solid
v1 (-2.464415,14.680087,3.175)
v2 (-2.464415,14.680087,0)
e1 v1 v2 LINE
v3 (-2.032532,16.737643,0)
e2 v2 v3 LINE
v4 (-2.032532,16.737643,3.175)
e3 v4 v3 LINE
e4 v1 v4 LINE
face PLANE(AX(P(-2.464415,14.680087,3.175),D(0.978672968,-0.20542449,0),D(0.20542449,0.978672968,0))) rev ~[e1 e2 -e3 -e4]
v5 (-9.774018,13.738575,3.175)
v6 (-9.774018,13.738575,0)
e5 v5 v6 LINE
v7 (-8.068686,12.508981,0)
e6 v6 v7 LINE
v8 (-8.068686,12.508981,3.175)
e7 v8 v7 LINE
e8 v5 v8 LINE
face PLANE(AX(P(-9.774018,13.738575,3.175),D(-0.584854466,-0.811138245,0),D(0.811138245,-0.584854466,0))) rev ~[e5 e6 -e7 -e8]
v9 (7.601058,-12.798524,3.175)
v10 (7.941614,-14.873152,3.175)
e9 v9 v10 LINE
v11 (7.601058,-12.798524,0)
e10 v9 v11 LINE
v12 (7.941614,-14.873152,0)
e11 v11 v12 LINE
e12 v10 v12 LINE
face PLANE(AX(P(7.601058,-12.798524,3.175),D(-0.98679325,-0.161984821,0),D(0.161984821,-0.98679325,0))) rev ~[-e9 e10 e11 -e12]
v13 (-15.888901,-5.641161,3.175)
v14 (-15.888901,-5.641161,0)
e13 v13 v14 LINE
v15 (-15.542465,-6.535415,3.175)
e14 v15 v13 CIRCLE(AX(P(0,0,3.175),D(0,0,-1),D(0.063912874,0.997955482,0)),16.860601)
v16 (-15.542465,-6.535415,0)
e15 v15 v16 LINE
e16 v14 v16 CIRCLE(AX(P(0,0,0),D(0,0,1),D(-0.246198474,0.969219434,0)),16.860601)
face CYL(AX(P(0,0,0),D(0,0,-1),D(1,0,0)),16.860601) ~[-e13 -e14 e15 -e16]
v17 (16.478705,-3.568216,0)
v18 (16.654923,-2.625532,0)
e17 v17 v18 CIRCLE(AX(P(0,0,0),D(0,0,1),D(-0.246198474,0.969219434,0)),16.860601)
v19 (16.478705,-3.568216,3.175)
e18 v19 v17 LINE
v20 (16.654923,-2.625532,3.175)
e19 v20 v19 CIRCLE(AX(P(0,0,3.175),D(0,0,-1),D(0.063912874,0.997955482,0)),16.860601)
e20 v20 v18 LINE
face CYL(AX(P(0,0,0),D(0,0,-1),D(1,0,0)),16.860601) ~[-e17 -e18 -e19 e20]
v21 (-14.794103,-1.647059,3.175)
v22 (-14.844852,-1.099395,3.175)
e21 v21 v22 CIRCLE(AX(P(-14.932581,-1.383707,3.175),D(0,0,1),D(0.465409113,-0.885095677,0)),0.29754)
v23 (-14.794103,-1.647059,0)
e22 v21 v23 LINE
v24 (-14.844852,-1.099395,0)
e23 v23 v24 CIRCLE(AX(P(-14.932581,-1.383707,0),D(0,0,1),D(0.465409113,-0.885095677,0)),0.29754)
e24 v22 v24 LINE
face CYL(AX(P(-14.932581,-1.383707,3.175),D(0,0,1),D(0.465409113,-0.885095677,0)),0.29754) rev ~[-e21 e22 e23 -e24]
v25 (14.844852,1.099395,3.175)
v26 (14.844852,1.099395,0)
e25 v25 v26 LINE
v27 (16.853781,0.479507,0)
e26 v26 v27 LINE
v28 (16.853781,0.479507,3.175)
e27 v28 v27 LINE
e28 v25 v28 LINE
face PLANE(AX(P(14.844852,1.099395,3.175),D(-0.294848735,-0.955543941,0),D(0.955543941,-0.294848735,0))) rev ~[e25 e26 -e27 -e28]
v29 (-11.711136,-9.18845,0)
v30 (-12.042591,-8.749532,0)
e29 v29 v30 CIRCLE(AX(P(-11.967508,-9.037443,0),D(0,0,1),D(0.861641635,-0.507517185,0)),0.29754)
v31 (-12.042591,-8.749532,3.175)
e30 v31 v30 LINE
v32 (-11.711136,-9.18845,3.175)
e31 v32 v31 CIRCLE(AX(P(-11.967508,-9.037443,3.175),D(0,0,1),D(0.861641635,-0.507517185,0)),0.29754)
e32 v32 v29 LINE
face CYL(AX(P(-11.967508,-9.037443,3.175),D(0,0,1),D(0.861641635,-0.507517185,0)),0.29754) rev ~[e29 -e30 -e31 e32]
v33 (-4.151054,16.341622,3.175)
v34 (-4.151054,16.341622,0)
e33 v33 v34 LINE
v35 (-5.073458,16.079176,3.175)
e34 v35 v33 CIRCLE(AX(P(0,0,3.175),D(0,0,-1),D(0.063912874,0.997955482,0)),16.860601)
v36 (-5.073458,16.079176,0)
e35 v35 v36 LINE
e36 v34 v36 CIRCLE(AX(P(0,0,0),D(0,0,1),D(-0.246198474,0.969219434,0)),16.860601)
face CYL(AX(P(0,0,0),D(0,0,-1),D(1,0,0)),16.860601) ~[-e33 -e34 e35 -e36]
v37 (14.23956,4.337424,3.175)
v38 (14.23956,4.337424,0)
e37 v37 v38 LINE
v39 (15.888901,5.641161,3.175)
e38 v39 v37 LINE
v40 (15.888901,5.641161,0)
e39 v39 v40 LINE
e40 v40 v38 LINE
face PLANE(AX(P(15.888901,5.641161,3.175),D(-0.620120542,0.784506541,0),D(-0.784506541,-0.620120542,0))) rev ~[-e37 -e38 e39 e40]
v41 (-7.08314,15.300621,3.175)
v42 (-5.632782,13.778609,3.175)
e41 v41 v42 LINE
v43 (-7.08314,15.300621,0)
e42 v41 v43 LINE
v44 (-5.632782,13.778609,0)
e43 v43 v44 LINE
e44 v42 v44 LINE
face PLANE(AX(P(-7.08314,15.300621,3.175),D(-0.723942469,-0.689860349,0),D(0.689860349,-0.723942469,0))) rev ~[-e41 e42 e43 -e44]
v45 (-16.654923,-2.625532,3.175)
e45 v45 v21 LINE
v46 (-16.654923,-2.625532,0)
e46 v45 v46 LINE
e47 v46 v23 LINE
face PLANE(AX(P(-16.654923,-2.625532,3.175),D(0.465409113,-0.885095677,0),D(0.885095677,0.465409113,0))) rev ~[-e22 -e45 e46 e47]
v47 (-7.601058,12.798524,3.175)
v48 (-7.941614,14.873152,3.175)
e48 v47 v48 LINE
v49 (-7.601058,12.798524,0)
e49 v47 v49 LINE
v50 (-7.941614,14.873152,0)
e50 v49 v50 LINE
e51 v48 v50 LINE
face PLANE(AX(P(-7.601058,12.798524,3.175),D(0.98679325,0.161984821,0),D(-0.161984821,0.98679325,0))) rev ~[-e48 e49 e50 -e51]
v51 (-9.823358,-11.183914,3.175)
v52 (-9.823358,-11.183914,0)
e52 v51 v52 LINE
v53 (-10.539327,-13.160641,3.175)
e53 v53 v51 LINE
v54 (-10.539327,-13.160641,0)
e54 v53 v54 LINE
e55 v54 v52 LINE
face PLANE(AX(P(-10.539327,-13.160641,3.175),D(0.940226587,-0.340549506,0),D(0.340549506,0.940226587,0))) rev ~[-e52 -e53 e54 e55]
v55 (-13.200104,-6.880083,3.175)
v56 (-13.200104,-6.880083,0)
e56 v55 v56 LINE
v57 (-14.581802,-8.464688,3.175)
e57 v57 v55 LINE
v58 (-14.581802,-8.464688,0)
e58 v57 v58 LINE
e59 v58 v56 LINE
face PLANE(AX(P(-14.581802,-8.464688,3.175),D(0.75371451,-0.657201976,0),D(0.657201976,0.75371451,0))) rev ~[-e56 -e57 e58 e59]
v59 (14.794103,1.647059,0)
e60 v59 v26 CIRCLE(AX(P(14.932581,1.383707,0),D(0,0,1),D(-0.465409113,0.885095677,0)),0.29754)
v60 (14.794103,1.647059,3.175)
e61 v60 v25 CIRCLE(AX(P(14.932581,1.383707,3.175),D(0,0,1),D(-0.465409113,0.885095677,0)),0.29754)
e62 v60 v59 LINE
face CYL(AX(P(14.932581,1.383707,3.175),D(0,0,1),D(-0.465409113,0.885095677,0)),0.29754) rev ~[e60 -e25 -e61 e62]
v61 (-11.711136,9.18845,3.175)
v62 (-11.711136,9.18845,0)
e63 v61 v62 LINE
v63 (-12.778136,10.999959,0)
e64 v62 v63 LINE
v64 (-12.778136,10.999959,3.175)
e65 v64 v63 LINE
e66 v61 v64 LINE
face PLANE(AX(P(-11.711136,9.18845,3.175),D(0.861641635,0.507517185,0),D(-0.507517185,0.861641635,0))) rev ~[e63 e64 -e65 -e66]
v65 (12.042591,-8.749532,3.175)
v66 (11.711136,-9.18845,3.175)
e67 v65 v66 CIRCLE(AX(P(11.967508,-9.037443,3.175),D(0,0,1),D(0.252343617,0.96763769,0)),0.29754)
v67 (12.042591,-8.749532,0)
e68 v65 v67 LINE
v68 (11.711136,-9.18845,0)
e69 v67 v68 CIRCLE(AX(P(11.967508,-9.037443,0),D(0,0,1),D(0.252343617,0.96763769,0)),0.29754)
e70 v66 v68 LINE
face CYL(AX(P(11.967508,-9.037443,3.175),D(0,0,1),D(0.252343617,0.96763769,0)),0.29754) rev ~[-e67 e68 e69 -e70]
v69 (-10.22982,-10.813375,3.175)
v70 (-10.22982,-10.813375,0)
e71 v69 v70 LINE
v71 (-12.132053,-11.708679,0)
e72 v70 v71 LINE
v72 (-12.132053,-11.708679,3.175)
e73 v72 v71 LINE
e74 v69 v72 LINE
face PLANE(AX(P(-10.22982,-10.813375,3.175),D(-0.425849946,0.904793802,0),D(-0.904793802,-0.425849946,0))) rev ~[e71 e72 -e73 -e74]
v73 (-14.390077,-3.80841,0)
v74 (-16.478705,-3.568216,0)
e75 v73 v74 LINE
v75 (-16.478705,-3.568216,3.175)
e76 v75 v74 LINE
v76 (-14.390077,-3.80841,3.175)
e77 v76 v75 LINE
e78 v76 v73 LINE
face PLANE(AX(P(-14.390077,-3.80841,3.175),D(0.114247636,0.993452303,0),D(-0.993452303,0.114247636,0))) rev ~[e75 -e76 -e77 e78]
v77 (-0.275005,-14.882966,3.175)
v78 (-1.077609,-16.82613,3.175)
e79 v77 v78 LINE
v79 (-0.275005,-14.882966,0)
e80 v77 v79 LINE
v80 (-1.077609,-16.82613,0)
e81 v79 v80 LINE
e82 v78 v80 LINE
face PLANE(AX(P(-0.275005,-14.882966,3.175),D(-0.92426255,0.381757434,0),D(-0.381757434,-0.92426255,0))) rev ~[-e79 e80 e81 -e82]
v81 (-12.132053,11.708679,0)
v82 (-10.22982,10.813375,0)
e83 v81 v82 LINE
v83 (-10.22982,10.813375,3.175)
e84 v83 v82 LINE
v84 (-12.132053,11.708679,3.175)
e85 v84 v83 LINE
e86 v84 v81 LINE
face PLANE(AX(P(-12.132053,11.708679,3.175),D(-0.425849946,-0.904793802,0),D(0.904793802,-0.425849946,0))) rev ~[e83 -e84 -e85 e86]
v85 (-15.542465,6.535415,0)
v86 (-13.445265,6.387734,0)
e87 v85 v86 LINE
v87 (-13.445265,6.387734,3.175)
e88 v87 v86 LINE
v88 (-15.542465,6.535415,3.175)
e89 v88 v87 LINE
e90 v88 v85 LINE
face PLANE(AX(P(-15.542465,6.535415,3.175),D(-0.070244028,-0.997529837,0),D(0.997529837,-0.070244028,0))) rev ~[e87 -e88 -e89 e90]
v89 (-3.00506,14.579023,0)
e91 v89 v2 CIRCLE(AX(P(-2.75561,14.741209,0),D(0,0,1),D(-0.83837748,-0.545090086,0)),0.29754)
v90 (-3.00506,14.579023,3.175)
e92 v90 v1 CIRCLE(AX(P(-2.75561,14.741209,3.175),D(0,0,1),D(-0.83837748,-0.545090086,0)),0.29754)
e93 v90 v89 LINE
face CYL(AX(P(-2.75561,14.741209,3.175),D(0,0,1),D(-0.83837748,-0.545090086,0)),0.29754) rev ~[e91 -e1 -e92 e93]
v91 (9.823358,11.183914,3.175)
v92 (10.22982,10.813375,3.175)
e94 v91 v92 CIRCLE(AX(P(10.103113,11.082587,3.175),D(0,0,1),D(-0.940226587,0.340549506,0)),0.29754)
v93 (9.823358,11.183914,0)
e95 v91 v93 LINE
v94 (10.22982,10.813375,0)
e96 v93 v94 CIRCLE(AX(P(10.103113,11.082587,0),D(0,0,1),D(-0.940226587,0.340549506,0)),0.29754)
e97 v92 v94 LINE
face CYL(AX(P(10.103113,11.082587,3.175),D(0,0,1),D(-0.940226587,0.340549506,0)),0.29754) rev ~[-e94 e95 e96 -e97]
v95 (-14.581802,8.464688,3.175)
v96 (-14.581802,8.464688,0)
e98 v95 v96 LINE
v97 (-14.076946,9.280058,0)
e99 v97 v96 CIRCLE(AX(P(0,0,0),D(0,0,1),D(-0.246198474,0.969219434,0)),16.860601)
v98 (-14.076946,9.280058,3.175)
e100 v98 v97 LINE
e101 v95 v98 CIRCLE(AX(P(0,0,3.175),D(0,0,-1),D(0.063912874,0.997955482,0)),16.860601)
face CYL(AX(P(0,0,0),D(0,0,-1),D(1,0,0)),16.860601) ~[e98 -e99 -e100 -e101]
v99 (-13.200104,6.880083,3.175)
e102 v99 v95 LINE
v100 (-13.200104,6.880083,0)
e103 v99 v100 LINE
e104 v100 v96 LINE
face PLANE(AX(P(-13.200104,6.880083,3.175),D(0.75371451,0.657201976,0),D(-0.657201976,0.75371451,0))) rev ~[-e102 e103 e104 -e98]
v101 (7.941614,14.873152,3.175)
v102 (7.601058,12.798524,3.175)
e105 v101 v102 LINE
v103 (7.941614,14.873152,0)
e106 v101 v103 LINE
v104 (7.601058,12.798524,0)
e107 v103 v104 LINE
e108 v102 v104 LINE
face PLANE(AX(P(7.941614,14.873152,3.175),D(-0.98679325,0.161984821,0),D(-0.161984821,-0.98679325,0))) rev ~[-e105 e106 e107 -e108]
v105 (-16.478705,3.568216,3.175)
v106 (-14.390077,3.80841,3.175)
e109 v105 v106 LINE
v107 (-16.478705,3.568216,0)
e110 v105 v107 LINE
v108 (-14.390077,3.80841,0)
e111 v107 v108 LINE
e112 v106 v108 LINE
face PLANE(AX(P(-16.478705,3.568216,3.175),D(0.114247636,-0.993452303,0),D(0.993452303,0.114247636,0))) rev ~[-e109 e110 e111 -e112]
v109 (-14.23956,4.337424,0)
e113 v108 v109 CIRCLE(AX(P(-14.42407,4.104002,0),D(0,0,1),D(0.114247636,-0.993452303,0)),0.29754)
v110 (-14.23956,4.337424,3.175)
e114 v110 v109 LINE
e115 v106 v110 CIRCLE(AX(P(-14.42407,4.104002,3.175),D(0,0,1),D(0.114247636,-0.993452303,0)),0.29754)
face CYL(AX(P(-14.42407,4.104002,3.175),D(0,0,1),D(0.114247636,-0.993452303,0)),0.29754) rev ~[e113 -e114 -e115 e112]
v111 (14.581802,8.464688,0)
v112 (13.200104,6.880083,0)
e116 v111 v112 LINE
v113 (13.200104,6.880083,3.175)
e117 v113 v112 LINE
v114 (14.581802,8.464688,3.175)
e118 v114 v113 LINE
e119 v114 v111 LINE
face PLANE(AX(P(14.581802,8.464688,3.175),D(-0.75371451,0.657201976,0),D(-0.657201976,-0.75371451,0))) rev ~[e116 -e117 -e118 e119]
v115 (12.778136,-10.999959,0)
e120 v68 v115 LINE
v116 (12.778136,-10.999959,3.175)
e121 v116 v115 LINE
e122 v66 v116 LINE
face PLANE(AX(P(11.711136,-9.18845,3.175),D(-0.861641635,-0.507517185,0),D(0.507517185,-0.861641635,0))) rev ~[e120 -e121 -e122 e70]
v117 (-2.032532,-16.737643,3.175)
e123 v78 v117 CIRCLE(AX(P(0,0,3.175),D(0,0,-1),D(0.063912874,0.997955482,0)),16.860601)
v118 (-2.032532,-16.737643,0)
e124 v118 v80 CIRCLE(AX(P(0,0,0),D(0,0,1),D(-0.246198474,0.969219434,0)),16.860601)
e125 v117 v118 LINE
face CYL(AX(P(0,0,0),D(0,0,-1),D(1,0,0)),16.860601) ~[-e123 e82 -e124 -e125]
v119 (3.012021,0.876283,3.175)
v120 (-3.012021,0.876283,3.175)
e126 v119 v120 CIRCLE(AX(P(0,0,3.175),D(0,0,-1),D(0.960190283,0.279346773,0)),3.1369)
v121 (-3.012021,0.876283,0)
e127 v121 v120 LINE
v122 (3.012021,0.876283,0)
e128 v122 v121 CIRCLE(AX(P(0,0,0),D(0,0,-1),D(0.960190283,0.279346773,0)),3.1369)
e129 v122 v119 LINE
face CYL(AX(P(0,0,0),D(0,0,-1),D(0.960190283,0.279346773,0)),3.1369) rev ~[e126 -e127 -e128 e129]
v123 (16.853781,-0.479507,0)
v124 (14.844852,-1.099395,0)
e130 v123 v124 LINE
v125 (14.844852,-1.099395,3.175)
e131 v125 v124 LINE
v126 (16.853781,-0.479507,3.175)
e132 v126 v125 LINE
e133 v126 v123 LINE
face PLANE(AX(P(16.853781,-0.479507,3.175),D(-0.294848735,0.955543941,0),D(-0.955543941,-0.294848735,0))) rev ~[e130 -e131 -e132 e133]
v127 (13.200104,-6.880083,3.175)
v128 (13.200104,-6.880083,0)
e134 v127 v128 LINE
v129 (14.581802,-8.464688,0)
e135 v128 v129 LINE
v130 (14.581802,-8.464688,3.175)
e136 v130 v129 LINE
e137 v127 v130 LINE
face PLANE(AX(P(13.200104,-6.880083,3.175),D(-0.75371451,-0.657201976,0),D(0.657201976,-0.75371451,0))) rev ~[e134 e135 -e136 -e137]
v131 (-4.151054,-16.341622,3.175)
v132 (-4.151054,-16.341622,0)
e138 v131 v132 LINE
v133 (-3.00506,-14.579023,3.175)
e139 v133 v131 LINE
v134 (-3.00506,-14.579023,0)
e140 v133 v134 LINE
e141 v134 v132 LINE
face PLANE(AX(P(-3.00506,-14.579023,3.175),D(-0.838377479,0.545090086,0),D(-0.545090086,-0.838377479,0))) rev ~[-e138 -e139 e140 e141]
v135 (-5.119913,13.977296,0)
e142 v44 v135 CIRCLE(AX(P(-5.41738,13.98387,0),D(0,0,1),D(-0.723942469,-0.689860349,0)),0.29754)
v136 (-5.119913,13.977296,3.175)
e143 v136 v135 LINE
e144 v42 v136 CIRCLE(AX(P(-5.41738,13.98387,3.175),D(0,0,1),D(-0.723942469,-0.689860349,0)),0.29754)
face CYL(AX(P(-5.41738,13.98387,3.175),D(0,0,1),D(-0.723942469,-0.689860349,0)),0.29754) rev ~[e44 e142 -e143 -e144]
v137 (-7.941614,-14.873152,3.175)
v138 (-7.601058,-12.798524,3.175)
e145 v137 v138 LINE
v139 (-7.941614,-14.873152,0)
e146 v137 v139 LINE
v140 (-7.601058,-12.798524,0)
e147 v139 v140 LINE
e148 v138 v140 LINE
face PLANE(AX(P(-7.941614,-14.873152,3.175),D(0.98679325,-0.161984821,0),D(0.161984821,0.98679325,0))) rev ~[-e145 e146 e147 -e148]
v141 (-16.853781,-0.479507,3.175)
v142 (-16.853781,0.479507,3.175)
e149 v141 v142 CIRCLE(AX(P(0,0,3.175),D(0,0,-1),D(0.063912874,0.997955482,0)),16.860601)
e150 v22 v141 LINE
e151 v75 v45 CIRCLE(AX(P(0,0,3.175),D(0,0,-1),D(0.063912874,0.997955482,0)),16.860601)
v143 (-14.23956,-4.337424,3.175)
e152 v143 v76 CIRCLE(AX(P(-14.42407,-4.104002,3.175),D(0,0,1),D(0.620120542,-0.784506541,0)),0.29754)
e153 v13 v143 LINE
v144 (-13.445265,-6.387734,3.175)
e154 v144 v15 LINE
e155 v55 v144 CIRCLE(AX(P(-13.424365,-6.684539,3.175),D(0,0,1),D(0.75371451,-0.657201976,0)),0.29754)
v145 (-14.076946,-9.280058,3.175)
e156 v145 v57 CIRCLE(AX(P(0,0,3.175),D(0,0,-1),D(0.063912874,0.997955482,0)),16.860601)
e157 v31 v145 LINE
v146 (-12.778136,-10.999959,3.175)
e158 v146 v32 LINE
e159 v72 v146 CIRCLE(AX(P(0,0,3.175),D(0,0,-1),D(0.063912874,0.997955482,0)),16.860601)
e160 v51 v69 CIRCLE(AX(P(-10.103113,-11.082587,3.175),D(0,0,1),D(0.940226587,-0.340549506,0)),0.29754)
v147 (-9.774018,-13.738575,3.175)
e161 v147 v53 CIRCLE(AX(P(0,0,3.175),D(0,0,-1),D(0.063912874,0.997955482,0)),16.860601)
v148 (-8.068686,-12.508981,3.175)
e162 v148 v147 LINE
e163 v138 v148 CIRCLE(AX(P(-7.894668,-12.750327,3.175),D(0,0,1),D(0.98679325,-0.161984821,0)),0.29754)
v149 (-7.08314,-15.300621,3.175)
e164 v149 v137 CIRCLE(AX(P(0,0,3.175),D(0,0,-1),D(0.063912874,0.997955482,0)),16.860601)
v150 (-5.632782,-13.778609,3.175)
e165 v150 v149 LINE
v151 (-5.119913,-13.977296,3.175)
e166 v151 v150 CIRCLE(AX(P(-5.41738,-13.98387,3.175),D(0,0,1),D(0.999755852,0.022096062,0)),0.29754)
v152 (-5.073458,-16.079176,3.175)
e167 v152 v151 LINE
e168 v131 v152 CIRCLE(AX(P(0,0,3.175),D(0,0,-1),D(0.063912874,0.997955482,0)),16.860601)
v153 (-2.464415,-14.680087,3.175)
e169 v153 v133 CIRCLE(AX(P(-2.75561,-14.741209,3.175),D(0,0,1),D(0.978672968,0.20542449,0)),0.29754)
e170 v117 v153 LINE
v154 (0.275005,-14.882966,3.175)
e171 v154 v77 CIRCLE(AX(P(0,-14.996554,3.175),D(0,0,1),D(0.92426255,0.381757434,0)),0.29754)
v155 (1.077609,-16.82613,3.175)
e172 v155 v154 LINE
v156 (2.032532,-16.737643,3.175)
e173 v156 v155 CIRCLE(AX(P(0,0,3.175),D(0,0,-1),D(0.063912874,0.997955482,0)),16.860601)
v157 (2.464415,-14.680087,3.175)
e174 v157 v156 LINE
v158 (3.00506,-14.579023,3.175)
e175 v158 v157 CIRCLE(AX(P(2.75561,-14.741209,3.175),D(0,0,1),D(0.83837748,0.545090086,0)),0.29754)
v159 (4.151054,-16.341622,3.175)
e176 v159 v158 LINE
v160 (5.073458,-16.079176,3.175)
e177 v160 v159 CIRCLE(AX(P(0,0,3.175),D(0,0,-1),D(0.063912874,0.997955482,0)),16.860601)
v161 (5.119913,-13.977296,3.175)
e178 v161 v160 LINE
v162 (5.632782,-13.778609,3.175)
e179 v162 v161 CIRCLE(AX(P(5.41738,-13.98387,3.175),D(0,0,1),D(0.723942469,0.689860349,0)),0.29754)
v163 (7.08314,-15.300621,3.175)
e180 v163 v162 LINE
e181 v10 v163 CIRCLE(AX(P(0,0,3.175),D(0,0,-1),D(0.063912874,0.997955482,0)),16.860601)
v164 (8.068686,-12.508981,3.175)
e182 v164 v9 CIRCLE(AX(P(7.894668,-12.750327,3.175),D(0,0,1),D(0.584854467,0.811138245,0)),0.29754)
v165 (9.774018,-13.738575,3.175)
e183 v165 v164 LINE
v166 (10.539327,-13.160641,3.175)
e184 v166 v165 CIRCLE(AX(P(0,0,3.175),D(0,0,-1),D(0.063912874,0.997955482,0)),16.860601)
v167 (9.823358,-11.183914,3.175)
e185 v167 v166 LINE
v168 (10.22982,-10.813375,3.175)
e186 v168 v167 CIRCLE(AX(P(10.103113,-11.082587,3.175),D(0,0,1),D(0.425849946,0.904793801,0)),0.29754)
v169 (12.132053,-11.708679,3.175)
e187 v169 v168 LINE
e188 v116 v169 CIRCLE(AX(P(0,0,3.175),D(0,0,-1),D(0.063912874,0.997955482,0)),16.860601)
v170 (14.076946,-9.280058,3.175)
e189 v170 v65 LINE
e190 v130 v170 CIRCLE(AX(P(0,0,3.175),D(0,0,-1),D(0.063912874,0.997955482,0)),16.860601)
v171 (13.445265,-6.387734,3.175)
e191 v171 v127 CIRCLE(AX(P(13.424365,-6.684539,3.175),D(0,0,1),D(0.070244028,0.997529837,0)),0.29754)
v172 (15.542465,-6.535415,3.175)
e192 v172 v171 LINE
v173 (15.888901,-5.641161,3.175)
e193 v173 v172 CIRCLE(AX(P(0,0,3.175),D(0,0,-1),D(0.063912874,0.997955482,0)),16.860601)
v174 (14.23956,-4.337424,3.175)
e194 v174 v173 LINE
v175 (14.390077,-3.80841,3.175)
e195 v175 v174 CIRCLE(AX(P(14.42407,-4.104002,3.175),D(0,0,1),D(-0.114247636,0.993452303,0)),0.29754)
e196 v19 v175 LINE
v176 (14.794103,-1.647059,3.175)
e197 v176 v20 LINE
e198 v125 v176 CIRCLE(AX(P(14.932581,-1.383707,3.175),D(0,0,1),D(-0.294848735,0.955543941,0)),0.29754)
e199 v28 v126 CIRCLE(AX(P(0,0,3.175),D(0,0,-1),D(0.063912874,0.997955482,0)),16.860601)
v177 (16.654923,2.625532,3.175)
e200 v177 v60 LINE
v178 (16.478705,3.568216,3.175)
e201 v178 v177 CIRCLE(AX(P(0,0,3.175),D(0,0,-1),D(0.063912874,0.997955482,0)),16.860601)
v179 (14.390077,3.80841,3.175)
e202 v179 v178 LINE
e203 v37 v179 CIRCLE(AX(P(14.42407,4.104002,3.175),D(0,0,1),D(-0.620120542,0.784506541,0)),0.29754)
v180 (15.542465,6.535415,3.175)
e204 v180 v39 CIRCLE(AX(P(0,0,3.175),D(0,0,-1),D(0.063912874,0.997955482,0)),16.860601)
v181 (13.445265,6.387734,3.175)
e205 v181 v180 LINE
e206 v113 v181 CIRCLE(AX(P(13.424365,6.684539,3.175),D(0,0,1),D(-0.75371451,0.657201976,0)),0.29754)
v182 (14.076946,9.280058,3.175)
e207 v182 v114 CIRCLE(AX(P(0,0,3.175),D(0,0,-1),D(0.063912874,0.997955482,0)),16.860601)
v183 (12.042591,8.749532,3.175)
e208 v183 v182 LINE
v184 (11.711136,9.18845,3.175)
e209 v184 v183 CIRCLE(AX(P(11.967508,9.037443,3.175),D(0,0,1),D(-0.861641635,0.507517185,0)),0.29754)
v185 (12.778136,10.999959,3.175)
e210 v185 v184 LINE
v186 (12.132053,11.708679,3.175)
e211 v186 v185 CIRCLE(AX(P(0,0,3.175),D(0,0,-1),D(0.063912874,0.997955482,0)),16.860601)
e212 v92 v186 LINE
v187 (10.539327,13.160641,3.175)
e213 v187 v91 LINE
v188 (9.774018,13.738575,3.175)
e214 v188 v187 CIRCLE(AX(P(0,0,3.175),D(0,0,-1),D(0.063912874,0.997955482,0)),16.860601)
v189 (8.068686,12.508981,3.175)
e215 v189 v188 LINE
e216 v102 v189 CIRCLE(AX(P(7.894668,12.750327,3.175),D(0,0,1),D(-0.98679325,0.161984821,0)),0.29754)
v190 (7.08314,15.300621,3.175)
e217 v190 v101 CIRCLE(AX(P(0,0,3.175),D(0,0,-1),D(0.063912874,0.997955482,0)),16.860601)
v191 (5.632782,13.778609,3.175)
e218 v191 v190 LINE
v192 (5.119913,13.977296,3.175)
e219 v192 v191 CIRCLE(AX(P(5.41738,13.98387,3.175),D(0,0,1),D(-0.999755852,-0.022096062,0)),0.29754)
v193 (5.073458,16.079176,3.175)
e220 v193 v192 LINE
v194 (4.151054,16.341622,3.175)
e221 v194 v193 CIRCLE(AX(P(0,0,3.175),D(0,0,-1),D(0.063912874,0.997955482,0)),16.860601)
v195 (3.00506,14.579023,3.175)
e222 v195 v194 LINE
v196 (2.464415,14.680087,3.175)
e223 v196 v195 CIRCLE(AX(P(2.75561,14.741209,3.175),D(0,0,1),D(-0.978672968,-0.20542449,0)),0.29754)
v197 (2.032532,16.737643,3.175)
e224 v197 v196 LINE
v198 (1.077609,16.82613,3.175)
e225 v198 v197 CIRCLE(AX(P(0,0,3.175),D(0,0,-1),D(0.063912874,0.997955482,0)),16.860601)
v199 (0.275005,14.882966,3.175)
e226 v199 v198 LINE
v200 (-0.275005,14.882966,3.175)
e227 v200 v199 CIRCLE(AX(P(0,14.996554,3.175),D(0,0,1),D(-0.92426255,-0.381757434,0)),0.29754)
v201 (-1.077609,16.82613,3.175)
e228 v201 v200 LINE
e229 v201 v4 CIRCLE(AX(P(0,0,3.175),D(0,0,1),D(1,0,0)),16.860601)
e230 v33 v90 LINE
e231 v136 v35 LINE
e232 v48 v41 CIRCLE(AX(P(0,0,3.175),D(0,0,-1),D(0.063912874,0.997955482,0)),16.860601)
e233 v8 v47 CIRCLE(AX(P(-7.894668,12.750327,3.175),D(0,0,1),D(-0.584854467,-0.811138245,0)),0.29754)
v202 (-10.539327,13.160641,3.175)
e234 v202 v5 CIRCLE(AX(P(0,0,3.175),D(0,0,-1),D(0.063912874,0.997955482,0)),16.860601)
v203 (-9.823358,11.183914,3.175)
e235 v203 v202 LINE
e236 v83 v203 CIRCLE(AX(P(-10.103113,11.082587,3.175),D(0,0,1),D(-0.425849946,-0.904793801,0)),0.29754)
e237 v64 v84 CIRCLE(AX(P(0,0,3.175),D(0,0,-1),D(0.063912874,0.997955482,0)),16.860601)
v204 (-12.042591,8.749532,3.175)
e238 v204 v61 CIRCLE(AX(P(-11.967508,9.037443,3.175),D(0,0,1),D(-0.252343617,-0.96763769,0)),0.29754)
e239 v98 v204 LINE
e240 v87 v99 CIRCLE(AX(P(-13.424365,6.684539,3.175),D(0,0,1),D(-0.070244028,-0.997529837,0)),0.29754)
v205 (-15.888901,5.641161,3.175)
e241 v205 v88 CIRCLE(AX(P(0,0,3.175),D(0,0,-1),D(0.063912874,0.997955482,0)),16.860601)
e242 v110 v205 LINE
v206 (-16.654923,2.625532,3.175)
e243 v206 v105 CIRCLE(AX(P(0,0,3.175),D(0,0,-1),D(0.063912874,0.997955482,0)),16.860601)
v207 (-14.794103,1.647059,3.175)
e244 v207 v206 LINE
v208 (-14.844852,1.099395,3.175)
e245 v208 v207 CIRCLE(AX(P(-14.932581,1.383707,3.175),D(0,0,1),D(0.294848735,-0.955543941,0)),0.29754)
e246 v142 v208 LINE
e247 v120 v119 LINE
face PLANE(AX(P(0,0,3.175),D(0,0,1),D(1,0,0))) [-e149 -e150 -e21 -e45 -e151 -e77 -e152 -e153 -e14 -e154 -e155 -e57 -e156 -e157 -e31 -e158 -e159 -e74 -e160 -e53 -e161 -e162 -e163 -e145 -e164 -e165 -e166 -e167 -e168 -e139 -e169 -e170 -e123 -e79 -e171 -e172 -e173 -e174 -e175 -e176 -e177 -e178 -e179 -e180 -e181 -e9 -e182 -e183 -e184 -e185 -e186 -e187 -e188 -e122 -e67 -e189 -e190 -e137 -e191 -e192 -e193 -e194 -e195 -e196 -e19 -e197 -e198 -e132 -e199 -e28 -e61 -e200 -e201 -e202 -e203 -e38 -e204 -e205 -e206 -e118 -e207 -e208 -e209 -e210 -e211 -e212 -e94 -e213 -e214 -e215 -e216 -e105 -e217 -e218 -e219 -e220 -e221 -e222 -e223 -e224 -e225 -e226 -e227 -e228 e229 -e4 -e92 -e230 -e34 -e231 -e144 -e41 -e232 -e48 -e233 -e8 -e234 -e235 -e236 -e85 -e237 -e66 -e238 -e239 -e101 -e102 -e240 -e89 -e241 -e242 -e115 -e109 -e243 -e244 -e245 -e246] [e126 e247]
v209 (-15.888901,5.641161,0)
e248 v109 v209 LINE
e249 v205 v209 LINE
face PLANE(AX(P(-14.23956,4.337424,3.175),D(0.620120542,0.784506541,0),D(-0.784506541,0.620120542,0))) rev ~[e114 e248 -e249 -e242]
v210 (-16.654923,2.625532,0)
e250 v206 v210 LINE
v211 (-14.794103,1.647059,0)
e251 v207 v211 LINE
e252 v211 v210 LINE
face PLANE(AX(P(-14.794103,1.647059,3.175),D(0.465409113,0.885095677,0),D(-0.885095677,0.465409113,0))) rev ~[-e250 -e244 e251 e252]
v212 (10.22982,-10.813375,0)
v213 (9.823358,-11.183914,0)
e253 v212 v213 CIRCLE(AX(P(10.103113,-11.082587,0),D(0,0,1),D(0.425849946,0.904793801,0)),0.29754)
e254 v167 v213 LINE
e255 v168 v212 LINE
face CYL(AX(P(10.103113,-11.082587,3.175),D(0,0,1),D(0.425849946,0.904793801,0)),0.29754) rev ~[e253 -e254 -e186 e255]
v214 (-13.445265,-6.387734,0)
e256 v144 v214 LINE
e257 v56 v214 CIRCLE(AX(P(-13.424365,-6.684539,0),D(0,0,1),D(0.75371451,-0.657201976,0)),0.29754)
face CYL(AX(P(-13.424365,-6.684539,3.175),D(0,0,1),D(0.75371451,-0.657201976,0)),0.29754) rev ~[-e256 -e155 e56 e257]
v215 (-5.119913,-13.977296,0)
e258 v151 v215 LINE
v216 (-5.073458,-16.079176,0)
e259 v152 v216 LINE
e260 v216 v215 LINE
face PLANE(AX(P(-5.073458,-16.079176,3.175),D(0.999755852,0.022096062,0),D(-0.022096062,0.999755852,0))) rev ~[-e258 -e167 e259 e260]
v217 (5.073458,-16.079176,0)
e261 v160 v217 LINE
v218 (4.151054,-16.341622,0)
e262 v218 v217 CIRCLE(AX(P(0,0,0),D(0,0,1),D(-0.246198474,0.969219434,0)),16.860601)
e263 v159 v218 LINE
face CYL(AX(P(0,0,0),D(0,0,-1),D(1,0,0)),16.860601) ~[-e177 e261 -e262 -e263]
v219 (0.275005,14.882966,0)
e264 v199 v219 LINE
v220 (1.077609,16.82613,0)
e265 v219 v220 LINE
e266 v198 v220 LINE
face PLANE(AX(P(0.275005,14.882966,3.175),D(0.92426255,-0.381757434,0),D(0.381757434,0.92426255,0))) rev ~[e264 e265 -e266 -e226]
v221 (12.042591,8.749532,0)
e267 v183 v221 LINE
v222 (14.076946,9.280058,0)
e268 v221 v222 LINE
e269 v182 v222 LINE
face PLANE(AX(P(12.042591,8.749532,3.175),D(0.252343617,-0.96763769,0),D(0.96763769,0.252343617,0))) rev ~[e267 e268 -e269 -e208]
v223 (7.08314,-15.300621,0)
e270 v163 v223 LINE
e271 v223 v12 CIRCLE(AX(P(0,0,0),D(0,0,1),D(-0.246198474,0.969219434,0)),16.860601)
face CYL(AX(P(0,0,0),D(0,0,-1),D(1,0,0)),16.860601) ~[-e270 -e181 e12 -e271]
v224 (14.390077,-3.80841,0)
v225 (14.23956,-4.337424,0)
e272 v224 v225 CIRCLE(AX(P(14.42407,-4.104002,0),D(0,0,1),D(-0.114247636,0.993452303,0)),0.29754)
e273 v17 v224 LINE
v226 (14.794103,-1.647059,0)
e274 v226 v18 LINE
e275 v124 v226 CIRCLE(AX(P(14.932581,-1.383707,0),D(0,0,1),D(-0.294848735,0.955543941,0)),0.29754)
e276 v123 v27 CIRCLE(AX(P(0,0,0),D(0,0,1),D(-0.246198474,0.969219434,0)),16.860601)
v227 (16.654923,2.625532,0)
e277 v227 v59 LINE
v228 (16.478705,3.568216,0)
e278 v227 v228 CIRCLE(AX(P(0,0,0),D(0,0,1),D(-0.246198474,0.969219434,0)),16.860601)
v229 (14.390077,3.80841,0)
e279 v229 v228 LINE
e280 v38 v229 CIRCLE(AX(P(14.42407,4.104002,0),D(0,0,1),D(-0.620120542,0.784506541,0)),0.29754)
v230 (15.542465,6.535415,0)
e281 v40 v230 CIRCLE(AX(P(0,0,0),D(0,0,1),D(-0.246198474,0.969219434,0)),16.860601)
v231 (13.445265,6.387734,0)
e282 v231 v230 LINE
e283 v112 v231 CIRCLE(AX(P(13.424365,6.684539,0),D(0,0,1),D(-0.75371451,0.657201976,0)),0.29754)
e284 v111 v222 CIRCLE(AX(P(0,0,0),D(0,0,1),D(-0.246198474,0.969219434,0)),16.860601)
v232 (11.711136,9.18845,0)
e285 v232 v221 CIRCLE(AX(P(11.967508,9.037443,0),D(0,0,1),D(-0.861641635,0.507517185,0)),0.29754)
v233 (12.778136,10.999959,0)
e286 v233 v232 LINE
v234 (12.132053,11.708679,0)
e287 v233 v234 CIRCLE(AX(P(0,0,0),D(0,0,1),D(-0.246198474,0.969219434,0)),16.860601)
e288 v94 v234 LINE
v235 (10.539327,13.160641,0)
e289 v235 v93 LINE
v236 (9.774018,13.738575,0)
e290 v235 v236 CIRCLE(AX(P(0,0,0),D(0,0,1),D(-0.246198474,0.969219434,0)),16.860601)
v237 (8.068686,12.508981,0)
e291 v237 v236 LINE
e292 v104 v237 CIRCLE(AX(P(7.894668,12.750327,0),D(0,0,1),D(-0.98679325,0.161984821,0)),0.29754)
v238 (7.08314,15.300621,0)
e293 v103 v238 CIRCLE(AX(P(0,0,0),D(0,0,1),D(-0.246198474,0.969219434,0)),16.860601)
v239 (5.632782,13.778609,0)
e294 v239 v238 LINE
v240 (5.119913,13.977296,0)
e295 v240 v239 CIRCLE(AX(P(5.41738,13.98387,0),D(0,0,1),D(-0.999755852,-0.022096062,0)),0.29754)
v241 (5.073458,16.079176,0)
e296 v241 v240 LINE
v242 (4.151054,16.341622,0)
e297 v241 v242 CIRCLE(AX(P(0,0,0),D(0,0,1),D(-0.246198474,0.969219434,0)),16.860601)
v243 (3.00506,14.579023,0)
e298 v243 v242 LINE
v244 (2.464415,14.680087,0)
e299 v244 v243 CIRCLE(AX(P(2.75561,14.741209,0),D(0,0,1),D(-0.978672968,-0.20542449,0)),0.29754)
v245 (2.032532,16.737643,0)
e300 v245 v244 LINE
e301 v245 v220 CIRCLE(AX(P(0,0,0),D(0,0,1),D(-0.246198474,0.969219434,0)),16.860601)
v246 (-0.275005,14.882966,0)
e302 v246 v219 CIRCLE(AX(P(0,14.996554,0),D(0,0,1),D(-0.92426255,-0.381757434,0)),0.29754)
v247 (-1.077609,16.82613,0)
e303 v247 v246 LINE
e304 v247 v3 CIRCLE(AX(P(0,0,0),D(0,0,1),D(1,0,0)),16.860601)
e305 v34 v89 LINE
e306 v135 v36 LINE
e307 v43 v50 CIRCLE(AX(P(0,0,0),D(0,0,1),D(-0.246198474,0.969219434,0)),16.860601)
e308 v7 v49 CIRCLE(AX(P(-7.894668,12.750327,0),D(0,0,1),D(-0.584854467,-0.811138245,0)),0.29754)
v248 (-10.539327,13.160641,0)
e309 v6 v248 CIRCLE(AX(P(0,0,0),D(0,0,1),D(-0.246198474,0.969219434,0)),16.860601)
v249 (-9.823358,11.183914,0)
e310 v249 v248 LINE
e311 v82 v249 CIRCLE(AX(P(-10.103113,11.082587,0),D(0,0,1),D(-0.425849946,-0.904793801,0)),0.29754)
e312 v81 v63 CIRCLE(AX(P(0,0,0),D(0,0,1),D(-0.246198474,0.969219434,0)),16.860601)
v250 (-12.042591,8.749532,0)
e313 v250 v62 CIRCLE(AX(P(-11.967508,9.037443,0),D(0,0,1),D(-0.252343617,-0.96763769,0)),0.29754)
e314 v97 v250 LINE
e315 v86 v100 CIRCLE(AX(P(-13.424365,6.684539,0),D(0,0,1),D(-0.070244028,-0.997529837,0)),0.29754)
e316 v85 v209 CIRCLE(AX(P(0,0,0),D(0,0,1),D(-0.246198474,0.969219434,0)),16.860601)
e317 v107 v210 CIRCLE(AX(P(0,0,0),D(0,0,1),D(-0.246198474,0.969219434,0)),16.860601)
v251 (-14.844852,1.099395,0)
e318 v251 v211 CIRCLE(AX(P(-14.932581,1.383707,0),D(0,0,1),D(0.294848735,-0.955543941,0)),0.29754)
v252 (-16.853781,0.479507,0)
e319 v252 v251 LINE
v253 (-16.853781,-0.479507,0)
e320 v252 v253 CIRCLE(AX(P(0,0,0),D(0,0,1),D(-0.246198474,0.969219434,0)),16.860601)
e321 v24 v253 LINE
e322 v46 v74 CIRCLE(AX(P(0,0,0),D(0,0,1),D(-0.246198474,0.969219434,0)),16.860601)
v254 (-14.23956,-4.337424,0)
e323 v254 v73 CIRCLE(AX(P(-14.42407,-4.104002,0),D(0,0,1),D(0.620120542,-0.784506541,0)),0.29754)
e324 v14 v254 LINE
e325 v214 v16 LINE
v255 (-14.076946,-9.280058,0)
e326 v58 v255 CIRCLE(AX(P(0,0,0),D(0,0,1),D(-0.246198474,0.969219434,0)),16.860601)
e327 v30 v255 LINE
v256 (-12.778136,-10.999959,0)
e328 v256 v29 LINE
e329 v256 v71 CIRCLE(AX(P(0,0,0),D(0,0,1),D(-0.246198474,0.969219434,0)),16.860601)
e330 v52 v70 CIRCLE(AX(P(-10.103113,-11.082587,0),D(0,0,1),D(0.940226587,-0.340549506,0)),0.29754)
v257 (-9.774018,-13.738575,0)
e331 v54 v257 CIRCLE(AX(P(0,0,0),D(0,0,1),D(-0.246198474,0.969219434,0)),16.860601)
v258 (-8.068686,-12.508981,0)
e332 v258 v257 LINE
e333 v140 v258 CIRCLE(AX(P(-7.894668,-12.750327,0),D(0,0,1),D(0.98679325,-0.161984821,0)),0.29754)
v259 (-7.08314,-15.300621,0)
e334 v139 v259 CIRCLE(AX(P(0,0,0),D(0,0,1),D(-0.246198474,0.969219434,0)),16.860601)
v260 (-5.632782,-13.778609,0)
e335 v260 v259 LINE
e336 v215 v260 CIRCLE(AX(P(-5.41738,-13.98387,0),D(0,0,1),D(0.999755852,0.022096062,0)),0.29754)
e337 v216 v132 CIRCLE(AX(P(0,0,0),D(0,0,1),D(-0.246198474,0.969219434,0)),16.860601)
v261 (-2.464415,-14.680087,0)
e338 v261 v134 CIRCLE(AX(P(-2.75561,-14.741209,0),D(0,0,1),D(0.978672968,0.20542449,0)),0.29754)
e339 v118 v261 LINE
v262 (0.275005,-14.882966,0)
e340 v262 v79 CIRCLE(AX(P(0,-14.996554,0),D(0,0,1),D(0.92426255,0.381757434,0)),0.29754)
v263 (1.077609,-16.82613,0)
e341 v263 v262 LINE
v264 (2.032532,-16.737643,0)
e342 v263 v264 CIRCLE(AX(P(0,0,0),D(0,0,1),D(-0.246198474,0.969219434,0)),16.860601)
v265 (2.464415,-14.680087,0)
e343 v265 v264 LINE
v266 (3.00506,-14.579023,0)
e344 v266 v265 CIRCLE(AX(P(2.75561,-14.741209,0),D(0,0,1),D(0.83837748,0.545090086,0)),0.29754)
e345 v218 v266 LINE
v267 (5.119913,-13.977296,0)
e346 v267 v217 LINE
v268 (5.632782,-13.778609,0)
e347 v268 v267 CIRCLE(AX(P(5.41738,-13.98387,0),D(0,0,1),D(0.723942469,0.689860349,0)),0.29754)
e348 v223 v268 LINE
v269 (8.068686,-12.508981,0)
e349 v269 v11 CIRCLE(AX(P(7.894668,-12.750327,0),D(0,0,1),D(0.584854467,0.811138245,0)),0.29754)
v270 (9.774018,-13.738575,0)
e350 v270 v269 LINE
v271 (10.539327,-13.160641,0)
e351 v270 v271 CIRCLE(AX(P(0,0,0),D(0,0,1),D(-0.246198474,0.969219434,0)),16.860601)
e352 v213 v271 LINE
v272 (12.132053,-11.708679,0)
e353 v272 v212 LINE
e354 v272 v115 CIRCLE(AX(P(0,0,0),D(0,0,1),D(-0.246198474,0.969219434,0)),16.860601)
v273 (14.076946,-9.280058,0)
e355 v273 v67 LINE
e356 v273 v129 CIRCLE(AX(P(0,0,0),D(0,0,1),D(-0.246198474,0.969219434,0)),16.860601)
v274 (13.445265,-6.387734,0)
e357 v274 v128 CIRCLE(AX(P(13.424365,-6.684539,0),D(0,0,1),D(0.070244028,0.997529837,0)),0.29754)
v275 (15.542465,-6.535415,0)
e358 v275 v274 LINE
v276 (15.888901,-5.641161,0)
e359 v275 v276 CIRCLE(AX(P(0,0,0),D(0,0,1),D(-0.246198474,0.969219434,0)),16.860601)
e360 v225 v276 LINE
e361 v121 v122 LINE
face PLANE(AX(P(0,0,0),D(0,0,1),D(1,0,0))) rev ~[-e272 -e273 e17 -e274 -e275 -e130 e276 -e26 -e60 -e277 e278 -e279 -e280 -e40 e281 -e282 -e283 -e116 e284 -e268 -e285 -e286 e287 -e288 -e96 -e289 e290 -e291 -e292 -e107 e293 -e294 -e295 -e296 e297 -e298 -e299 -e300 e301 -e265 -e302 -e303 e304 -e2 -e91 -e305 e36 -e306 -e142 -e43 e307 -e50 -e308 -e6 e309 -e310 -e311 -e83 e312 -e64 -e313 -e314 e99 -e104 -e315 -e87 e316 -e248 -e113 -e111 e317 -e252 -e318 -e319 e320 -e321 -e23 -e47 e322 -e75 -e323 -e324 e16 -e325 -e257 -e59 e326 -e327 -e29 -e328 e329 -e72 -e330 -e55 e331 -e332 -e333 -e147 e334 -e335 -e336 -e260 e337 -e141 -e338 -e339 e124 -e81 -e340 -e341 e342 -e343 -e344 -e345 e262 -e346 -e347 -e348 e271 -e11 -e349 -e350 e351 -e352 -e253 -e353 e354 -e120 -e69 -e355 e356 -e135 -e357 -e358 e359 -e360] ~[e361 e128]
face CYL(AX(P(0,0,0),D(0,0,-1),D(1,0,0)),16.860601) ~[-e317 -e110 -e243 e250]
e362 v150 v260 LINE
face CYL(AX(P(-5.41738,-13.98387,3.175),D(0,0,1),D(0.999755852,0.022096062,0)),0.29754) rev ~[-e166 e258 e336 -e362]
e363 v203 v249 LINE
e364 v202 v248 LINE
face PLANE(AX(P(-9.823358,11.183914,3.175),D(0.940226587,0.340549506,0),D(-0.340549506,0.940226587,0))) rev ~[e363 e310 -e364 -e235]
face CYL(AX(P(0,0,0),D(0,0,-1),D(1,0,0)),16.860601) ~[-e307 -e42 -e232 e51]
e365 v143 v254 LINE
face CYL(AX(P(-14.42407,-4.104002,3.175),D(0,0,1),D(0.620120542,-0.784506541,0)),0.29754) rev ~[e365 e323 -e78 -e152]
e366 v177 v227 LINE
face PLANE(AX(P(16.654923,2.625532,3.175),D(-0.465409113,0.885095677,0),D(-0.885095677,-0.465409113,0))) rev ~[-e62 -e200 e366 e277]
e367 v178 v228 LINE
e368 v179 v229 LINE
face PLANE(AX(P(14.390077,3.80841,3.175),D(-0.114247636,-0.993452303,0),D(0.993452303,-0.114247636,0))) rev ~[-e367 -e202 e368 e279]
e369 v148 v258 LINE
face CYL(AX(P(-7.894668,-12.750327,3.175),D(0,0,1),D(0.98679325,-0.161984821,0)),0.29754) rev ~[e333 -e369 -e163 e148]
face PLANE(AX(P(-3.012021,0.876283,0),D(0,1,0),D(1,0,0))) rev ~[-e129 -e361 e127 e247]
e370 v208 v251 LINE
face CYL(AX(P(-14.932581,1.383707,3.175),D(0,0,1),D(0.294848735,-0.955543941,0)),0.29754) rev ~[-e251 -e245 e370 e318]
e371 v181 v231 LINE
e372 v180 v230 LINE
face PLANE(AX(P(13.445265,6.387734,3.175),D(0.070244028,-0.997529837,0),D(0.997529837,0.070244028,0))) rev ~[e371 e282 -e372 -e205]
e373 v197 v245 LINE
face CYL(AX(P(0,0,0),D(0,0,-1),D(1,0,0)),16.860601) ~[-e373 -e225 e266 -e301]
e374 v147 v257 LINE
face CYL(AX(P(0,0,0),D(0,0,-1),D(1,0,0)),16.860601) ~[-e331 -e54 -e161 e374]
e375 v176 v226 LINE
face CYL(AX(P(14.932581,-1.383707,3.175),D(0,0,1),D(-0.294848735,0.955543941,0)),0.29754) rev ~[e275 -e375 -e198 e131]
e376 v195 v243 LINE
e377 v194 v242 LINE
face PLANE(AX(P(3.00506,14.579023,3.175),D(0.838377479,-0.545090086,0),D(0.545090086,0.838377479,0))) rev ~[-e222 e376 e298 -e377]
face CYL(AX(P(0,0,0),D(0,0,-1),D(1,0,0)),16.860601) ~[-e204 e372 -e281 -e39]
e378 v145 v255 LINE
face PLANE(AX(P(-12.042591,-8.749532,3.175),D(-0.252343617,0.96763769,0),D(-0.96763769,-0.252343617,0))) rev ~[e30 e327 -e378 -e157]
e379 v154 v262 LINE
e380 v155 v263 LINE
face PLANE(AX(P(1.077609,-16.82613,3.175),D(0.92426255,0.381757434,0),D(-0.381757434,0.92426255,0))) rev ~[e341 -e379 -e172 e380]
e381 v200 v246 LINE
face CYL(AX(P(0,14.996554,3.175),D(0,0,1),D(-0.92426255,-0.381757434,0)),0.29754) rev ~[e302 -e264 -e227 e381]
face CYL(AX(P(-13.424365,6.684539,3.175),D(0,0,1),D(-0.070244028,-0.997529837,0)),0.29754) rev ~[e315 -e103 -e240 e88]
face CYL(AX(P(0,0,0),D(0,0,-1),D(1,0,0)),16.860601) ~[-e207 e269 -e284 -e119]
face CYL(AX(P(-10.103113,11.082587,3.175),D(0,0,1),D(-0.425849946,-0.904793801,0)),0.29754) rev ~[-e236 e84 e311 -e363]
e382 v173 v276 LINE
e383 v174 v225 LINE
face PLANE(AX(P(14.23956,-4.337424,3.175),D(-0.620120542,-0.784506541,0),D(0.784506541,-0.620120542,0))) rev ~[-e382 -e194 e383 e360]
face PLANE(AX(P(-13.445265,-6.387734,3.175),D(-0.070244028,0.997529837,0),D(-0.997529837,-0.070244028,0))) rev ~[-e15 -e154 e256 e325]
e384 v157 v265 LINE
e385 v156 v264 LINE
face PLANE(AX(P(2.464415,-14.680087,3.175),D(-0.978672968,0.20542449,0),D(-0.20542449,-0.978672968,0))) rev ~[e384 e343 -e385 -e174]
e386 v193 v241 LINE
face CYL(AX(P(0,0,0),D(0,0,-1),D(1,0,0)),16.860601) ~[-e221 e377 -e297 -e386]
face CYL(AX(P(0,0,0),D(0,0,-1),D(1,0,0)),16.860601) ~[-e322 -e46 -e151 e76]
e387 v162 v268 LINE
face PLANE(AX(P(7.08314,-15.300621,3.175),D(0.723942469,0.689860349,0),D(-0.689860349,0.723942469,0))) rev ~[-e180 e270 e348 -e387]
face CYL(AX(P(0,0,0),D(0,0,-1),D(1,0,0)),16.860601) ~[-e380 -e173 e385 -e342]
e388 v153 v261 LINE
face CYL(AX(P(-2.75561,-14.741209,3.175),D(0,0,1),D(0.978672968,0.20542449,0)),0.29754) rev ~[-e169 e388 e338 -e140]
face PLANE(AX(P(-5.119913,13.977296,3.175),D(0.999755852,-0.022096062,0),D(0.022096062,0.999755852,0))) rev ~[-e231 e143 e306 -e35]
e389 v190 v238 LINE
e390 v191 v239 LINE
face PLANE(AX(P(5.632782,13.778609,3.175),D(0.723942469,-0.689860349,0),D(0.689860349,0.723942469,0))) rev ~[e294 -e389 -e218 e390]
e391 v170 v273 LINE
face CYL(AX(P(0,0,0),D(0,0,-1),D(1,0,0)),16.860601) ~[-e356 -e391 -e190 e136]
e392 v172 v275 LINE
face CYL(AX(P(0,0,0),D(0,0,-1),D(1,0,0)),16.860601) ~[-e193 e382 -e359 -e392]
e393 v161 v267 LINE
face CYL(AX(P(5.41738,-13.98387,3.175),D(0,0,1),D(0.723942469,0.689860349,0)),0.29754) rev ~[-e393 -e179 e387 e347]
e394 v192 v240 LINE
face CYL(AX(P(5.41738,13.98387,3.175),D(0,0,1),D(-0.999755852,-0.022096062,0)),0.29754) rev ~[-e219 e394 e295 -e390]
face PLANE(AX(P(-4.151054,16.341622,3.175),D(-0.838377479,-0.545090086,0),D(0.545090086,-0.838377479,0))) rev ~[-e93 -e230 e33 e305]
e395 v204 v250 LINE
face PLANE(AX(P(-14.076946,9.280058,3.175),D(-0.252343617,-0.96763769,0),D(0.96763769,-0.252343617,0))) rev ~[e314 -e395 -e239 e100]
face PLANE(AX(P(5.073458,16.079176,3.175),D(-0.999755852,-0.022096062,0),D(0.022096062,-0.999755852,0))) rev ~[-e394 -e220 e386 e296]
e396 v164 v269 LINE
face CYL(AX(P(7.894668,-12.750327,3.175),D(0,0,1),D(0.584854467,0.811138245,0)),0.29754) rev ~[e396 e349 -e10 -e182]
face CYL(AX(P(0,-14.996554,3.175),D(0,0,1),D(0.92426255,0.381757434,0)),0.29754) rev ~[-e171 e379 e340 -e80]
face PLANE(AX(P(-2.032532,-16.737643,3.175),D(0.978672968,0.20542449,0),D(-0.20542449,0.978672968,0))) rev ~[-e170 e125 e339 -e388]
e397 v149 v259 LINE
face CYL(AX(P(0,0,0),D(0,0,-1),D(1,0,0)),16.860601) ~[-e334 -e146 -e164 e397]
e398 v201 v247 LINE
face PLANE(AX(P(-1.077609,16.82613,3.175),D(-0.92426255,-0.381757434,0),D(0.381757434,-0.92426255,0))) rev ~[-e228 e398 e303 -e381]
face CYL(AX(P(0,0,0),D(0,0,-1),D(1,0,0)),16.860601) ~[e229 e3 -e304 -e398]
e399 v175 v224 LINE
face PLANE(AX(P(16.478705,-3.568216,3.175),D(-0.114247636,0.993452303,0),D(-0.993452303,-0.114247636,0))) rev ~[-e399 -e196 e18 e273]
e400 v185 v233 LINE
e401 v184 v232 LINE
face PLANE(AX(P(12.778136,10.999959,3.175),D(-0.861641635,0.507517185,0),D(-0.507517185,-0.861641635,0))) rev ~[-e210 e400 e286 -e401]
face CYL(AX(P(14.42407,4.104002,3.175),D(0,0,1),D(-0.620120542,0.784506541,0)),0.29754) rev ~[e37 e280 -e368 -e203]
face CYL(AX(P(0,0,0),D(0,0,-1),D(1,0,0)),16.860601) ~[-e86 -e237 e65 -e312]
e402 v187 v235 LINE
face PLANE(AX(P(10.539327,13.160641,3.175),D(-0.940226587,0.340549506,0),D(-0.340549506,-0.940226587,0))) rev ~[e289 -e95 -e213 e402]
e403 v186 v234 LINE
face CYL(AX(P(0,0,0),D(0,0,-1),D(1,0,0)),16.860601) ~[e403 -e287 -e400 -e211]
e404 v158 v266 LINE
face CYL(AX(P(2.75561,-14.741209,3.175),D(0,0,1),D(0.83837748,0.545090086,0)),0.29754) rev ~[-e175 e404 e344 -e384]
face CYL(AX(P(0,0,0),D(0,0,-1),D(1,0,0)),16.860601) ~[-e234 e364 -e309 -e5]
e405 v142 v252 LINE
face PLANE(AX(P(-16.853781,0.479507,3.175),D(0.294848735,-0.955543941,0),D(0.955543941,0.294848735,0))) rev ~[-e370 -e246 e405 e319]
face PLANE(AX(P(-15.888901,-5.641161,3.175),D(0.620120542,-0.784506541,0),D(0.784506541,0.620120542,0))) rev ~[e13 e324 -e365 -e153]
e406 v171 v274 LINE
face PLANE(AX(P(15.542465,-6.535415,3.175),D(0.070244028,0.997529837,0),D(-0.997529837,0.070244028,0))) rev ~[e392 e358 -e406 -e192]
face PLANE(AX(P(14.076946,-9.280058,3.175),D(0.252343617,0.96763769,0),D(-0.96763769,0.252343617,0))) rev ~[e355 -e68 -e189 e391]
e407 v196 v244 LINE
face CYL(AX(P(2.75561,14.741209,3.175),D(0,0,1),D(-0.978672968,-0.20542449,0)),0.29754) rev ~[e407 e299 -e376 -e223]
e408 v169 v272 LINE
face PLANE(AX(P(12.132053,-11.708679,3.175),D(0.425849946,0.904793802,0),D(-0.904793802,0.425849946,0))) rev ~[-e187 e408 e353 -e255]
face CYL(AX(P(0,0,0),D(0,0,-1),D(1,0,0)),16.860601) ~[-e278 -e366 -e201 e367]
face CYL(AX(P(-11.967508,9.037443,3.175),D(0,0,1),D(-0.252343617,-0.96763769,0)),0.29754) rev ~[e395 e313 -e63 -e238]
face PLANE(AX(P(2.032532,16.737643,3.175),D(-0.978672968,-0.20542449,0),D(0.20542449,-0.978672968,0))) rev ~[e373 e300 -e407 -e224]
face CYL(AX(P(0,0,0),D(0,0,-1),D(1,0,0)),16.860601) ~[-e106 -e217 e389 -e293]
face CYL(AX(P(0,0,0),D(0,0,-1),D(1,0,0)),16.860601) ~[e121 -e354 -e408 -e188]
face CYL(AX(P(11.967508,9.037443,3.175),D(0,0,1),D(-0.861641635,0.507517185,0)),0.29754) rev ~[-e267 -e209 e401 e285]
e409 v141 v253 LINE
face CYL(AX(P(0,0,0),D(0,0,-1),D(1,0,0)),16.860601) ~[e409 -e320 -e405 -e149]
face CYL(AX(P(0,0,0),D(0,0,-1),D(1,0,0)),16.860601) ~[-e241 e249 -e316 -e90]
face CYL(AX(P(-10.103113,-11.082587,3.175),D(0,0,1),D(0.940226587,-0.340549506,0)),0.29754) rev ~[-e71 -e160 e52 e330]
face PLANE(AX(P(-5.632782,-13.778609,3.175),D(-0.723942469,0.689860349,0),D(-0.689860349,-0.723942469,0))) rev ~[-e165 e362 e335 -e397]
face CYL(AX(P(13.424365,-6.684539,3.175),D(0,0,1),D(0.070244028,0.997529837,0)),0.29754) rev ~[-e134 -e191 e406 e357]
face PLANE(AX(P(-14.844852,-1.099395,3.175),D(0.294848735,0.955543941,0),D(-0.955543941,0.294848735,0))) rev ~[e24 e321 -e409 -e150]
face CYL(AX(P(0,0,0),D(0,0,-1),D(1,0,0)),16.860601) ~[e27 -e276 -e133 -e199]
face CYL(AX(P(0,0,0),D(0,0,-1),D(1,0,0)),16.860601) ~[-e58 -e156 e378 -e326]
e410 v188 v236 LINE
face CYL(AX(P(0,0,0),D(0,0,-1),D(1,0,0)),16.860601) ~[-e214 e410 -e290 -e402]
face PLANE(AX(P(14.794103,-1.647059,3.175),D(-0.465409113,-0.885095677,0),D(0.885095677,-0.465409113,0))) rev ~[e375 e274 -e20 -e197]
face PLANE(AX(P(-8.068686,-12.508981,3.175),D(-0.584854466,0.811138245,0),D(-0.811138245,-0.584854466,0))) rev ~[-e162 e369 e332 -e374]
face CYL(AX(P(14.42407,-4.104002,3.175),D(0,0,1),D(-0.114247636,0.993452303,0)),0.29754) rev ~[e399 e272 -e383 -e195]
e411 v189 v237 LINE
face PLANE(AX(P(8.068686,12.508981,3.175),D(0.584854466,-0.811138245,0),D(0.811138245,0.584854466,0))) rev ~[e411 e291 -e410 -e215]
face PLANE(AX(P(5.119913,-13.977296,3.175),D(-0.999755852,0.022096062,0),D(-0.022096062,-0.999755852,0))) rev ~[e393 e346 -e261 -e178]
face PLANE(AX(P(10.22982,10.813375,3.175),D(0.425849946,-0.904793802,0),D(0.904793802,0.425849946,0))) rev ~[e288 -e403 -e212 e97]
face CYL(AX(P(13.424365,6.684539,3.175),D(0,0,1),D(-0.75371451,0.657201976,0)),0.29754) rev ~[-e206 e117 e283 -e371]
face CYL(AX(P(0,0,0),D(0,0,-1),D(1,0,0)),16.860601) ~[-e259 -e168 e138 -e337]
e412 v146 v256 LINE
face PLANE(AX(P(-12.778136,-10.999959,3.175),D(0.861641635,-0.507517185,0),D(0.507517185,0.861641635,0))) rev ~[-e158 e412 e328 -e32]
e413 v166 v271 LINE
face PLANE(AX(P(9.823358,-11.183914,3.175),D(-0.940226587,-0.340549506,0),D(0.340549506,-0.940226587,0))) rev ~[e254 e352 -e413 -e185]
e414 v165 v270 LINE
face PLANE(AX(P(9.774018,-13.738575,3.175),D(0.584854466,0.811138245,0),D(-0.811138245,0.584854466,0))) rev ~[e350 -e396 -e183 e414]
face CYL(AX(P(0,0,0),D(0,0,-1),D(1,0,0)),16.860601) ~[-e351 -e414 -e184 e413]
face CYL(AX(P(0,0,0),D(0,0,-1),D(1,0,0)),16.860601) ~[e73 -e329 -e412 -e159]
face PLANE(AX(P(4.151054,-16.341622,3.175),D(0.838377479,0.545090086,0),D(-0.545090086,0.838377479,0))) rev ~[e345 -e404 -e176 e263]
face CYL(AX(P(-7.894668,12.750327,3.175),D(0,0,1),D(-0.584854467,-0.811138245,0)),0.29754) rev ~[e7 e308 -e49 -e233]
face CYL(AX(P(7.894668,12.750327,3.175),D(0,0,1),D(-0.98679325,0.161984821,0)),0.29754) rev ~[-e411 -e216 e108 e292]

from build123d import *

# Parameters (mm, degrees)
F0_R            = 16.8606013276
F1_DEPTH        = 3.175
F3_DEPTH        = 3.175
F3_COPIES_COUNT = 34


# Not quite as in the source:
# - a pattern or mirror of a feature is missing from the dataset's text; its kind, count and spacing are read off the source's solid
# - a feature names something its author has since deleted; it is built from what else it names


with BuildPart() as f1:
    # F0 (on Top) → F1 (new body)
    with BuildSketch(Plane.XY):
        Circle(F0_R)
        with BuildLine():
            ThreePointArc((3.0120209, 0.8762828927), (0, -3.1369), (-3.0120209, 0.8762828927))
            Line((-3.0120209, 0.8762828927), (3.0120209, 0.8762828927))
        make_face(mode=Mode.SUBTRACT)
    extrude(amount=F1_DEPTH)

    # F2 (on face) → F3 (cut, through all)
    with BuildSketch(Plane.XY.offset(3.175)):
        with BuildLine():
            Line((0.2750051008, 14.882965874), (1.0776094804, 16.8261295293))
            ThreePointArc((1.0776094804, 16.8261295293), (0, 16.8606013276), (-1.0776094804, 16.8261295293))
            Line((-1.0776094804, 16.8261295293), (-0.2750051008, 14.882965874))
            ThreePointArc((-0.2750051008, 14.882965874), (0, 14.6990139664), (0.2750051008, 14.882965874))
        make_face()
    f3 = extrude(amount=-F3_DEPTH, mode=Mode.SUBTRACT)

    # F3_copies: F3 ×34 about axis
    f3_copies_axis = Axis((0, 0, 0), (0, 0, 1))
    for i in range(1, F3_COPIES_COUNT):
        add(f3.rotate(f3_copies_axis, i * 360 / F3_COPIES_COUNT), mode=Mode.SUBTRACT)


solid = f1.part
